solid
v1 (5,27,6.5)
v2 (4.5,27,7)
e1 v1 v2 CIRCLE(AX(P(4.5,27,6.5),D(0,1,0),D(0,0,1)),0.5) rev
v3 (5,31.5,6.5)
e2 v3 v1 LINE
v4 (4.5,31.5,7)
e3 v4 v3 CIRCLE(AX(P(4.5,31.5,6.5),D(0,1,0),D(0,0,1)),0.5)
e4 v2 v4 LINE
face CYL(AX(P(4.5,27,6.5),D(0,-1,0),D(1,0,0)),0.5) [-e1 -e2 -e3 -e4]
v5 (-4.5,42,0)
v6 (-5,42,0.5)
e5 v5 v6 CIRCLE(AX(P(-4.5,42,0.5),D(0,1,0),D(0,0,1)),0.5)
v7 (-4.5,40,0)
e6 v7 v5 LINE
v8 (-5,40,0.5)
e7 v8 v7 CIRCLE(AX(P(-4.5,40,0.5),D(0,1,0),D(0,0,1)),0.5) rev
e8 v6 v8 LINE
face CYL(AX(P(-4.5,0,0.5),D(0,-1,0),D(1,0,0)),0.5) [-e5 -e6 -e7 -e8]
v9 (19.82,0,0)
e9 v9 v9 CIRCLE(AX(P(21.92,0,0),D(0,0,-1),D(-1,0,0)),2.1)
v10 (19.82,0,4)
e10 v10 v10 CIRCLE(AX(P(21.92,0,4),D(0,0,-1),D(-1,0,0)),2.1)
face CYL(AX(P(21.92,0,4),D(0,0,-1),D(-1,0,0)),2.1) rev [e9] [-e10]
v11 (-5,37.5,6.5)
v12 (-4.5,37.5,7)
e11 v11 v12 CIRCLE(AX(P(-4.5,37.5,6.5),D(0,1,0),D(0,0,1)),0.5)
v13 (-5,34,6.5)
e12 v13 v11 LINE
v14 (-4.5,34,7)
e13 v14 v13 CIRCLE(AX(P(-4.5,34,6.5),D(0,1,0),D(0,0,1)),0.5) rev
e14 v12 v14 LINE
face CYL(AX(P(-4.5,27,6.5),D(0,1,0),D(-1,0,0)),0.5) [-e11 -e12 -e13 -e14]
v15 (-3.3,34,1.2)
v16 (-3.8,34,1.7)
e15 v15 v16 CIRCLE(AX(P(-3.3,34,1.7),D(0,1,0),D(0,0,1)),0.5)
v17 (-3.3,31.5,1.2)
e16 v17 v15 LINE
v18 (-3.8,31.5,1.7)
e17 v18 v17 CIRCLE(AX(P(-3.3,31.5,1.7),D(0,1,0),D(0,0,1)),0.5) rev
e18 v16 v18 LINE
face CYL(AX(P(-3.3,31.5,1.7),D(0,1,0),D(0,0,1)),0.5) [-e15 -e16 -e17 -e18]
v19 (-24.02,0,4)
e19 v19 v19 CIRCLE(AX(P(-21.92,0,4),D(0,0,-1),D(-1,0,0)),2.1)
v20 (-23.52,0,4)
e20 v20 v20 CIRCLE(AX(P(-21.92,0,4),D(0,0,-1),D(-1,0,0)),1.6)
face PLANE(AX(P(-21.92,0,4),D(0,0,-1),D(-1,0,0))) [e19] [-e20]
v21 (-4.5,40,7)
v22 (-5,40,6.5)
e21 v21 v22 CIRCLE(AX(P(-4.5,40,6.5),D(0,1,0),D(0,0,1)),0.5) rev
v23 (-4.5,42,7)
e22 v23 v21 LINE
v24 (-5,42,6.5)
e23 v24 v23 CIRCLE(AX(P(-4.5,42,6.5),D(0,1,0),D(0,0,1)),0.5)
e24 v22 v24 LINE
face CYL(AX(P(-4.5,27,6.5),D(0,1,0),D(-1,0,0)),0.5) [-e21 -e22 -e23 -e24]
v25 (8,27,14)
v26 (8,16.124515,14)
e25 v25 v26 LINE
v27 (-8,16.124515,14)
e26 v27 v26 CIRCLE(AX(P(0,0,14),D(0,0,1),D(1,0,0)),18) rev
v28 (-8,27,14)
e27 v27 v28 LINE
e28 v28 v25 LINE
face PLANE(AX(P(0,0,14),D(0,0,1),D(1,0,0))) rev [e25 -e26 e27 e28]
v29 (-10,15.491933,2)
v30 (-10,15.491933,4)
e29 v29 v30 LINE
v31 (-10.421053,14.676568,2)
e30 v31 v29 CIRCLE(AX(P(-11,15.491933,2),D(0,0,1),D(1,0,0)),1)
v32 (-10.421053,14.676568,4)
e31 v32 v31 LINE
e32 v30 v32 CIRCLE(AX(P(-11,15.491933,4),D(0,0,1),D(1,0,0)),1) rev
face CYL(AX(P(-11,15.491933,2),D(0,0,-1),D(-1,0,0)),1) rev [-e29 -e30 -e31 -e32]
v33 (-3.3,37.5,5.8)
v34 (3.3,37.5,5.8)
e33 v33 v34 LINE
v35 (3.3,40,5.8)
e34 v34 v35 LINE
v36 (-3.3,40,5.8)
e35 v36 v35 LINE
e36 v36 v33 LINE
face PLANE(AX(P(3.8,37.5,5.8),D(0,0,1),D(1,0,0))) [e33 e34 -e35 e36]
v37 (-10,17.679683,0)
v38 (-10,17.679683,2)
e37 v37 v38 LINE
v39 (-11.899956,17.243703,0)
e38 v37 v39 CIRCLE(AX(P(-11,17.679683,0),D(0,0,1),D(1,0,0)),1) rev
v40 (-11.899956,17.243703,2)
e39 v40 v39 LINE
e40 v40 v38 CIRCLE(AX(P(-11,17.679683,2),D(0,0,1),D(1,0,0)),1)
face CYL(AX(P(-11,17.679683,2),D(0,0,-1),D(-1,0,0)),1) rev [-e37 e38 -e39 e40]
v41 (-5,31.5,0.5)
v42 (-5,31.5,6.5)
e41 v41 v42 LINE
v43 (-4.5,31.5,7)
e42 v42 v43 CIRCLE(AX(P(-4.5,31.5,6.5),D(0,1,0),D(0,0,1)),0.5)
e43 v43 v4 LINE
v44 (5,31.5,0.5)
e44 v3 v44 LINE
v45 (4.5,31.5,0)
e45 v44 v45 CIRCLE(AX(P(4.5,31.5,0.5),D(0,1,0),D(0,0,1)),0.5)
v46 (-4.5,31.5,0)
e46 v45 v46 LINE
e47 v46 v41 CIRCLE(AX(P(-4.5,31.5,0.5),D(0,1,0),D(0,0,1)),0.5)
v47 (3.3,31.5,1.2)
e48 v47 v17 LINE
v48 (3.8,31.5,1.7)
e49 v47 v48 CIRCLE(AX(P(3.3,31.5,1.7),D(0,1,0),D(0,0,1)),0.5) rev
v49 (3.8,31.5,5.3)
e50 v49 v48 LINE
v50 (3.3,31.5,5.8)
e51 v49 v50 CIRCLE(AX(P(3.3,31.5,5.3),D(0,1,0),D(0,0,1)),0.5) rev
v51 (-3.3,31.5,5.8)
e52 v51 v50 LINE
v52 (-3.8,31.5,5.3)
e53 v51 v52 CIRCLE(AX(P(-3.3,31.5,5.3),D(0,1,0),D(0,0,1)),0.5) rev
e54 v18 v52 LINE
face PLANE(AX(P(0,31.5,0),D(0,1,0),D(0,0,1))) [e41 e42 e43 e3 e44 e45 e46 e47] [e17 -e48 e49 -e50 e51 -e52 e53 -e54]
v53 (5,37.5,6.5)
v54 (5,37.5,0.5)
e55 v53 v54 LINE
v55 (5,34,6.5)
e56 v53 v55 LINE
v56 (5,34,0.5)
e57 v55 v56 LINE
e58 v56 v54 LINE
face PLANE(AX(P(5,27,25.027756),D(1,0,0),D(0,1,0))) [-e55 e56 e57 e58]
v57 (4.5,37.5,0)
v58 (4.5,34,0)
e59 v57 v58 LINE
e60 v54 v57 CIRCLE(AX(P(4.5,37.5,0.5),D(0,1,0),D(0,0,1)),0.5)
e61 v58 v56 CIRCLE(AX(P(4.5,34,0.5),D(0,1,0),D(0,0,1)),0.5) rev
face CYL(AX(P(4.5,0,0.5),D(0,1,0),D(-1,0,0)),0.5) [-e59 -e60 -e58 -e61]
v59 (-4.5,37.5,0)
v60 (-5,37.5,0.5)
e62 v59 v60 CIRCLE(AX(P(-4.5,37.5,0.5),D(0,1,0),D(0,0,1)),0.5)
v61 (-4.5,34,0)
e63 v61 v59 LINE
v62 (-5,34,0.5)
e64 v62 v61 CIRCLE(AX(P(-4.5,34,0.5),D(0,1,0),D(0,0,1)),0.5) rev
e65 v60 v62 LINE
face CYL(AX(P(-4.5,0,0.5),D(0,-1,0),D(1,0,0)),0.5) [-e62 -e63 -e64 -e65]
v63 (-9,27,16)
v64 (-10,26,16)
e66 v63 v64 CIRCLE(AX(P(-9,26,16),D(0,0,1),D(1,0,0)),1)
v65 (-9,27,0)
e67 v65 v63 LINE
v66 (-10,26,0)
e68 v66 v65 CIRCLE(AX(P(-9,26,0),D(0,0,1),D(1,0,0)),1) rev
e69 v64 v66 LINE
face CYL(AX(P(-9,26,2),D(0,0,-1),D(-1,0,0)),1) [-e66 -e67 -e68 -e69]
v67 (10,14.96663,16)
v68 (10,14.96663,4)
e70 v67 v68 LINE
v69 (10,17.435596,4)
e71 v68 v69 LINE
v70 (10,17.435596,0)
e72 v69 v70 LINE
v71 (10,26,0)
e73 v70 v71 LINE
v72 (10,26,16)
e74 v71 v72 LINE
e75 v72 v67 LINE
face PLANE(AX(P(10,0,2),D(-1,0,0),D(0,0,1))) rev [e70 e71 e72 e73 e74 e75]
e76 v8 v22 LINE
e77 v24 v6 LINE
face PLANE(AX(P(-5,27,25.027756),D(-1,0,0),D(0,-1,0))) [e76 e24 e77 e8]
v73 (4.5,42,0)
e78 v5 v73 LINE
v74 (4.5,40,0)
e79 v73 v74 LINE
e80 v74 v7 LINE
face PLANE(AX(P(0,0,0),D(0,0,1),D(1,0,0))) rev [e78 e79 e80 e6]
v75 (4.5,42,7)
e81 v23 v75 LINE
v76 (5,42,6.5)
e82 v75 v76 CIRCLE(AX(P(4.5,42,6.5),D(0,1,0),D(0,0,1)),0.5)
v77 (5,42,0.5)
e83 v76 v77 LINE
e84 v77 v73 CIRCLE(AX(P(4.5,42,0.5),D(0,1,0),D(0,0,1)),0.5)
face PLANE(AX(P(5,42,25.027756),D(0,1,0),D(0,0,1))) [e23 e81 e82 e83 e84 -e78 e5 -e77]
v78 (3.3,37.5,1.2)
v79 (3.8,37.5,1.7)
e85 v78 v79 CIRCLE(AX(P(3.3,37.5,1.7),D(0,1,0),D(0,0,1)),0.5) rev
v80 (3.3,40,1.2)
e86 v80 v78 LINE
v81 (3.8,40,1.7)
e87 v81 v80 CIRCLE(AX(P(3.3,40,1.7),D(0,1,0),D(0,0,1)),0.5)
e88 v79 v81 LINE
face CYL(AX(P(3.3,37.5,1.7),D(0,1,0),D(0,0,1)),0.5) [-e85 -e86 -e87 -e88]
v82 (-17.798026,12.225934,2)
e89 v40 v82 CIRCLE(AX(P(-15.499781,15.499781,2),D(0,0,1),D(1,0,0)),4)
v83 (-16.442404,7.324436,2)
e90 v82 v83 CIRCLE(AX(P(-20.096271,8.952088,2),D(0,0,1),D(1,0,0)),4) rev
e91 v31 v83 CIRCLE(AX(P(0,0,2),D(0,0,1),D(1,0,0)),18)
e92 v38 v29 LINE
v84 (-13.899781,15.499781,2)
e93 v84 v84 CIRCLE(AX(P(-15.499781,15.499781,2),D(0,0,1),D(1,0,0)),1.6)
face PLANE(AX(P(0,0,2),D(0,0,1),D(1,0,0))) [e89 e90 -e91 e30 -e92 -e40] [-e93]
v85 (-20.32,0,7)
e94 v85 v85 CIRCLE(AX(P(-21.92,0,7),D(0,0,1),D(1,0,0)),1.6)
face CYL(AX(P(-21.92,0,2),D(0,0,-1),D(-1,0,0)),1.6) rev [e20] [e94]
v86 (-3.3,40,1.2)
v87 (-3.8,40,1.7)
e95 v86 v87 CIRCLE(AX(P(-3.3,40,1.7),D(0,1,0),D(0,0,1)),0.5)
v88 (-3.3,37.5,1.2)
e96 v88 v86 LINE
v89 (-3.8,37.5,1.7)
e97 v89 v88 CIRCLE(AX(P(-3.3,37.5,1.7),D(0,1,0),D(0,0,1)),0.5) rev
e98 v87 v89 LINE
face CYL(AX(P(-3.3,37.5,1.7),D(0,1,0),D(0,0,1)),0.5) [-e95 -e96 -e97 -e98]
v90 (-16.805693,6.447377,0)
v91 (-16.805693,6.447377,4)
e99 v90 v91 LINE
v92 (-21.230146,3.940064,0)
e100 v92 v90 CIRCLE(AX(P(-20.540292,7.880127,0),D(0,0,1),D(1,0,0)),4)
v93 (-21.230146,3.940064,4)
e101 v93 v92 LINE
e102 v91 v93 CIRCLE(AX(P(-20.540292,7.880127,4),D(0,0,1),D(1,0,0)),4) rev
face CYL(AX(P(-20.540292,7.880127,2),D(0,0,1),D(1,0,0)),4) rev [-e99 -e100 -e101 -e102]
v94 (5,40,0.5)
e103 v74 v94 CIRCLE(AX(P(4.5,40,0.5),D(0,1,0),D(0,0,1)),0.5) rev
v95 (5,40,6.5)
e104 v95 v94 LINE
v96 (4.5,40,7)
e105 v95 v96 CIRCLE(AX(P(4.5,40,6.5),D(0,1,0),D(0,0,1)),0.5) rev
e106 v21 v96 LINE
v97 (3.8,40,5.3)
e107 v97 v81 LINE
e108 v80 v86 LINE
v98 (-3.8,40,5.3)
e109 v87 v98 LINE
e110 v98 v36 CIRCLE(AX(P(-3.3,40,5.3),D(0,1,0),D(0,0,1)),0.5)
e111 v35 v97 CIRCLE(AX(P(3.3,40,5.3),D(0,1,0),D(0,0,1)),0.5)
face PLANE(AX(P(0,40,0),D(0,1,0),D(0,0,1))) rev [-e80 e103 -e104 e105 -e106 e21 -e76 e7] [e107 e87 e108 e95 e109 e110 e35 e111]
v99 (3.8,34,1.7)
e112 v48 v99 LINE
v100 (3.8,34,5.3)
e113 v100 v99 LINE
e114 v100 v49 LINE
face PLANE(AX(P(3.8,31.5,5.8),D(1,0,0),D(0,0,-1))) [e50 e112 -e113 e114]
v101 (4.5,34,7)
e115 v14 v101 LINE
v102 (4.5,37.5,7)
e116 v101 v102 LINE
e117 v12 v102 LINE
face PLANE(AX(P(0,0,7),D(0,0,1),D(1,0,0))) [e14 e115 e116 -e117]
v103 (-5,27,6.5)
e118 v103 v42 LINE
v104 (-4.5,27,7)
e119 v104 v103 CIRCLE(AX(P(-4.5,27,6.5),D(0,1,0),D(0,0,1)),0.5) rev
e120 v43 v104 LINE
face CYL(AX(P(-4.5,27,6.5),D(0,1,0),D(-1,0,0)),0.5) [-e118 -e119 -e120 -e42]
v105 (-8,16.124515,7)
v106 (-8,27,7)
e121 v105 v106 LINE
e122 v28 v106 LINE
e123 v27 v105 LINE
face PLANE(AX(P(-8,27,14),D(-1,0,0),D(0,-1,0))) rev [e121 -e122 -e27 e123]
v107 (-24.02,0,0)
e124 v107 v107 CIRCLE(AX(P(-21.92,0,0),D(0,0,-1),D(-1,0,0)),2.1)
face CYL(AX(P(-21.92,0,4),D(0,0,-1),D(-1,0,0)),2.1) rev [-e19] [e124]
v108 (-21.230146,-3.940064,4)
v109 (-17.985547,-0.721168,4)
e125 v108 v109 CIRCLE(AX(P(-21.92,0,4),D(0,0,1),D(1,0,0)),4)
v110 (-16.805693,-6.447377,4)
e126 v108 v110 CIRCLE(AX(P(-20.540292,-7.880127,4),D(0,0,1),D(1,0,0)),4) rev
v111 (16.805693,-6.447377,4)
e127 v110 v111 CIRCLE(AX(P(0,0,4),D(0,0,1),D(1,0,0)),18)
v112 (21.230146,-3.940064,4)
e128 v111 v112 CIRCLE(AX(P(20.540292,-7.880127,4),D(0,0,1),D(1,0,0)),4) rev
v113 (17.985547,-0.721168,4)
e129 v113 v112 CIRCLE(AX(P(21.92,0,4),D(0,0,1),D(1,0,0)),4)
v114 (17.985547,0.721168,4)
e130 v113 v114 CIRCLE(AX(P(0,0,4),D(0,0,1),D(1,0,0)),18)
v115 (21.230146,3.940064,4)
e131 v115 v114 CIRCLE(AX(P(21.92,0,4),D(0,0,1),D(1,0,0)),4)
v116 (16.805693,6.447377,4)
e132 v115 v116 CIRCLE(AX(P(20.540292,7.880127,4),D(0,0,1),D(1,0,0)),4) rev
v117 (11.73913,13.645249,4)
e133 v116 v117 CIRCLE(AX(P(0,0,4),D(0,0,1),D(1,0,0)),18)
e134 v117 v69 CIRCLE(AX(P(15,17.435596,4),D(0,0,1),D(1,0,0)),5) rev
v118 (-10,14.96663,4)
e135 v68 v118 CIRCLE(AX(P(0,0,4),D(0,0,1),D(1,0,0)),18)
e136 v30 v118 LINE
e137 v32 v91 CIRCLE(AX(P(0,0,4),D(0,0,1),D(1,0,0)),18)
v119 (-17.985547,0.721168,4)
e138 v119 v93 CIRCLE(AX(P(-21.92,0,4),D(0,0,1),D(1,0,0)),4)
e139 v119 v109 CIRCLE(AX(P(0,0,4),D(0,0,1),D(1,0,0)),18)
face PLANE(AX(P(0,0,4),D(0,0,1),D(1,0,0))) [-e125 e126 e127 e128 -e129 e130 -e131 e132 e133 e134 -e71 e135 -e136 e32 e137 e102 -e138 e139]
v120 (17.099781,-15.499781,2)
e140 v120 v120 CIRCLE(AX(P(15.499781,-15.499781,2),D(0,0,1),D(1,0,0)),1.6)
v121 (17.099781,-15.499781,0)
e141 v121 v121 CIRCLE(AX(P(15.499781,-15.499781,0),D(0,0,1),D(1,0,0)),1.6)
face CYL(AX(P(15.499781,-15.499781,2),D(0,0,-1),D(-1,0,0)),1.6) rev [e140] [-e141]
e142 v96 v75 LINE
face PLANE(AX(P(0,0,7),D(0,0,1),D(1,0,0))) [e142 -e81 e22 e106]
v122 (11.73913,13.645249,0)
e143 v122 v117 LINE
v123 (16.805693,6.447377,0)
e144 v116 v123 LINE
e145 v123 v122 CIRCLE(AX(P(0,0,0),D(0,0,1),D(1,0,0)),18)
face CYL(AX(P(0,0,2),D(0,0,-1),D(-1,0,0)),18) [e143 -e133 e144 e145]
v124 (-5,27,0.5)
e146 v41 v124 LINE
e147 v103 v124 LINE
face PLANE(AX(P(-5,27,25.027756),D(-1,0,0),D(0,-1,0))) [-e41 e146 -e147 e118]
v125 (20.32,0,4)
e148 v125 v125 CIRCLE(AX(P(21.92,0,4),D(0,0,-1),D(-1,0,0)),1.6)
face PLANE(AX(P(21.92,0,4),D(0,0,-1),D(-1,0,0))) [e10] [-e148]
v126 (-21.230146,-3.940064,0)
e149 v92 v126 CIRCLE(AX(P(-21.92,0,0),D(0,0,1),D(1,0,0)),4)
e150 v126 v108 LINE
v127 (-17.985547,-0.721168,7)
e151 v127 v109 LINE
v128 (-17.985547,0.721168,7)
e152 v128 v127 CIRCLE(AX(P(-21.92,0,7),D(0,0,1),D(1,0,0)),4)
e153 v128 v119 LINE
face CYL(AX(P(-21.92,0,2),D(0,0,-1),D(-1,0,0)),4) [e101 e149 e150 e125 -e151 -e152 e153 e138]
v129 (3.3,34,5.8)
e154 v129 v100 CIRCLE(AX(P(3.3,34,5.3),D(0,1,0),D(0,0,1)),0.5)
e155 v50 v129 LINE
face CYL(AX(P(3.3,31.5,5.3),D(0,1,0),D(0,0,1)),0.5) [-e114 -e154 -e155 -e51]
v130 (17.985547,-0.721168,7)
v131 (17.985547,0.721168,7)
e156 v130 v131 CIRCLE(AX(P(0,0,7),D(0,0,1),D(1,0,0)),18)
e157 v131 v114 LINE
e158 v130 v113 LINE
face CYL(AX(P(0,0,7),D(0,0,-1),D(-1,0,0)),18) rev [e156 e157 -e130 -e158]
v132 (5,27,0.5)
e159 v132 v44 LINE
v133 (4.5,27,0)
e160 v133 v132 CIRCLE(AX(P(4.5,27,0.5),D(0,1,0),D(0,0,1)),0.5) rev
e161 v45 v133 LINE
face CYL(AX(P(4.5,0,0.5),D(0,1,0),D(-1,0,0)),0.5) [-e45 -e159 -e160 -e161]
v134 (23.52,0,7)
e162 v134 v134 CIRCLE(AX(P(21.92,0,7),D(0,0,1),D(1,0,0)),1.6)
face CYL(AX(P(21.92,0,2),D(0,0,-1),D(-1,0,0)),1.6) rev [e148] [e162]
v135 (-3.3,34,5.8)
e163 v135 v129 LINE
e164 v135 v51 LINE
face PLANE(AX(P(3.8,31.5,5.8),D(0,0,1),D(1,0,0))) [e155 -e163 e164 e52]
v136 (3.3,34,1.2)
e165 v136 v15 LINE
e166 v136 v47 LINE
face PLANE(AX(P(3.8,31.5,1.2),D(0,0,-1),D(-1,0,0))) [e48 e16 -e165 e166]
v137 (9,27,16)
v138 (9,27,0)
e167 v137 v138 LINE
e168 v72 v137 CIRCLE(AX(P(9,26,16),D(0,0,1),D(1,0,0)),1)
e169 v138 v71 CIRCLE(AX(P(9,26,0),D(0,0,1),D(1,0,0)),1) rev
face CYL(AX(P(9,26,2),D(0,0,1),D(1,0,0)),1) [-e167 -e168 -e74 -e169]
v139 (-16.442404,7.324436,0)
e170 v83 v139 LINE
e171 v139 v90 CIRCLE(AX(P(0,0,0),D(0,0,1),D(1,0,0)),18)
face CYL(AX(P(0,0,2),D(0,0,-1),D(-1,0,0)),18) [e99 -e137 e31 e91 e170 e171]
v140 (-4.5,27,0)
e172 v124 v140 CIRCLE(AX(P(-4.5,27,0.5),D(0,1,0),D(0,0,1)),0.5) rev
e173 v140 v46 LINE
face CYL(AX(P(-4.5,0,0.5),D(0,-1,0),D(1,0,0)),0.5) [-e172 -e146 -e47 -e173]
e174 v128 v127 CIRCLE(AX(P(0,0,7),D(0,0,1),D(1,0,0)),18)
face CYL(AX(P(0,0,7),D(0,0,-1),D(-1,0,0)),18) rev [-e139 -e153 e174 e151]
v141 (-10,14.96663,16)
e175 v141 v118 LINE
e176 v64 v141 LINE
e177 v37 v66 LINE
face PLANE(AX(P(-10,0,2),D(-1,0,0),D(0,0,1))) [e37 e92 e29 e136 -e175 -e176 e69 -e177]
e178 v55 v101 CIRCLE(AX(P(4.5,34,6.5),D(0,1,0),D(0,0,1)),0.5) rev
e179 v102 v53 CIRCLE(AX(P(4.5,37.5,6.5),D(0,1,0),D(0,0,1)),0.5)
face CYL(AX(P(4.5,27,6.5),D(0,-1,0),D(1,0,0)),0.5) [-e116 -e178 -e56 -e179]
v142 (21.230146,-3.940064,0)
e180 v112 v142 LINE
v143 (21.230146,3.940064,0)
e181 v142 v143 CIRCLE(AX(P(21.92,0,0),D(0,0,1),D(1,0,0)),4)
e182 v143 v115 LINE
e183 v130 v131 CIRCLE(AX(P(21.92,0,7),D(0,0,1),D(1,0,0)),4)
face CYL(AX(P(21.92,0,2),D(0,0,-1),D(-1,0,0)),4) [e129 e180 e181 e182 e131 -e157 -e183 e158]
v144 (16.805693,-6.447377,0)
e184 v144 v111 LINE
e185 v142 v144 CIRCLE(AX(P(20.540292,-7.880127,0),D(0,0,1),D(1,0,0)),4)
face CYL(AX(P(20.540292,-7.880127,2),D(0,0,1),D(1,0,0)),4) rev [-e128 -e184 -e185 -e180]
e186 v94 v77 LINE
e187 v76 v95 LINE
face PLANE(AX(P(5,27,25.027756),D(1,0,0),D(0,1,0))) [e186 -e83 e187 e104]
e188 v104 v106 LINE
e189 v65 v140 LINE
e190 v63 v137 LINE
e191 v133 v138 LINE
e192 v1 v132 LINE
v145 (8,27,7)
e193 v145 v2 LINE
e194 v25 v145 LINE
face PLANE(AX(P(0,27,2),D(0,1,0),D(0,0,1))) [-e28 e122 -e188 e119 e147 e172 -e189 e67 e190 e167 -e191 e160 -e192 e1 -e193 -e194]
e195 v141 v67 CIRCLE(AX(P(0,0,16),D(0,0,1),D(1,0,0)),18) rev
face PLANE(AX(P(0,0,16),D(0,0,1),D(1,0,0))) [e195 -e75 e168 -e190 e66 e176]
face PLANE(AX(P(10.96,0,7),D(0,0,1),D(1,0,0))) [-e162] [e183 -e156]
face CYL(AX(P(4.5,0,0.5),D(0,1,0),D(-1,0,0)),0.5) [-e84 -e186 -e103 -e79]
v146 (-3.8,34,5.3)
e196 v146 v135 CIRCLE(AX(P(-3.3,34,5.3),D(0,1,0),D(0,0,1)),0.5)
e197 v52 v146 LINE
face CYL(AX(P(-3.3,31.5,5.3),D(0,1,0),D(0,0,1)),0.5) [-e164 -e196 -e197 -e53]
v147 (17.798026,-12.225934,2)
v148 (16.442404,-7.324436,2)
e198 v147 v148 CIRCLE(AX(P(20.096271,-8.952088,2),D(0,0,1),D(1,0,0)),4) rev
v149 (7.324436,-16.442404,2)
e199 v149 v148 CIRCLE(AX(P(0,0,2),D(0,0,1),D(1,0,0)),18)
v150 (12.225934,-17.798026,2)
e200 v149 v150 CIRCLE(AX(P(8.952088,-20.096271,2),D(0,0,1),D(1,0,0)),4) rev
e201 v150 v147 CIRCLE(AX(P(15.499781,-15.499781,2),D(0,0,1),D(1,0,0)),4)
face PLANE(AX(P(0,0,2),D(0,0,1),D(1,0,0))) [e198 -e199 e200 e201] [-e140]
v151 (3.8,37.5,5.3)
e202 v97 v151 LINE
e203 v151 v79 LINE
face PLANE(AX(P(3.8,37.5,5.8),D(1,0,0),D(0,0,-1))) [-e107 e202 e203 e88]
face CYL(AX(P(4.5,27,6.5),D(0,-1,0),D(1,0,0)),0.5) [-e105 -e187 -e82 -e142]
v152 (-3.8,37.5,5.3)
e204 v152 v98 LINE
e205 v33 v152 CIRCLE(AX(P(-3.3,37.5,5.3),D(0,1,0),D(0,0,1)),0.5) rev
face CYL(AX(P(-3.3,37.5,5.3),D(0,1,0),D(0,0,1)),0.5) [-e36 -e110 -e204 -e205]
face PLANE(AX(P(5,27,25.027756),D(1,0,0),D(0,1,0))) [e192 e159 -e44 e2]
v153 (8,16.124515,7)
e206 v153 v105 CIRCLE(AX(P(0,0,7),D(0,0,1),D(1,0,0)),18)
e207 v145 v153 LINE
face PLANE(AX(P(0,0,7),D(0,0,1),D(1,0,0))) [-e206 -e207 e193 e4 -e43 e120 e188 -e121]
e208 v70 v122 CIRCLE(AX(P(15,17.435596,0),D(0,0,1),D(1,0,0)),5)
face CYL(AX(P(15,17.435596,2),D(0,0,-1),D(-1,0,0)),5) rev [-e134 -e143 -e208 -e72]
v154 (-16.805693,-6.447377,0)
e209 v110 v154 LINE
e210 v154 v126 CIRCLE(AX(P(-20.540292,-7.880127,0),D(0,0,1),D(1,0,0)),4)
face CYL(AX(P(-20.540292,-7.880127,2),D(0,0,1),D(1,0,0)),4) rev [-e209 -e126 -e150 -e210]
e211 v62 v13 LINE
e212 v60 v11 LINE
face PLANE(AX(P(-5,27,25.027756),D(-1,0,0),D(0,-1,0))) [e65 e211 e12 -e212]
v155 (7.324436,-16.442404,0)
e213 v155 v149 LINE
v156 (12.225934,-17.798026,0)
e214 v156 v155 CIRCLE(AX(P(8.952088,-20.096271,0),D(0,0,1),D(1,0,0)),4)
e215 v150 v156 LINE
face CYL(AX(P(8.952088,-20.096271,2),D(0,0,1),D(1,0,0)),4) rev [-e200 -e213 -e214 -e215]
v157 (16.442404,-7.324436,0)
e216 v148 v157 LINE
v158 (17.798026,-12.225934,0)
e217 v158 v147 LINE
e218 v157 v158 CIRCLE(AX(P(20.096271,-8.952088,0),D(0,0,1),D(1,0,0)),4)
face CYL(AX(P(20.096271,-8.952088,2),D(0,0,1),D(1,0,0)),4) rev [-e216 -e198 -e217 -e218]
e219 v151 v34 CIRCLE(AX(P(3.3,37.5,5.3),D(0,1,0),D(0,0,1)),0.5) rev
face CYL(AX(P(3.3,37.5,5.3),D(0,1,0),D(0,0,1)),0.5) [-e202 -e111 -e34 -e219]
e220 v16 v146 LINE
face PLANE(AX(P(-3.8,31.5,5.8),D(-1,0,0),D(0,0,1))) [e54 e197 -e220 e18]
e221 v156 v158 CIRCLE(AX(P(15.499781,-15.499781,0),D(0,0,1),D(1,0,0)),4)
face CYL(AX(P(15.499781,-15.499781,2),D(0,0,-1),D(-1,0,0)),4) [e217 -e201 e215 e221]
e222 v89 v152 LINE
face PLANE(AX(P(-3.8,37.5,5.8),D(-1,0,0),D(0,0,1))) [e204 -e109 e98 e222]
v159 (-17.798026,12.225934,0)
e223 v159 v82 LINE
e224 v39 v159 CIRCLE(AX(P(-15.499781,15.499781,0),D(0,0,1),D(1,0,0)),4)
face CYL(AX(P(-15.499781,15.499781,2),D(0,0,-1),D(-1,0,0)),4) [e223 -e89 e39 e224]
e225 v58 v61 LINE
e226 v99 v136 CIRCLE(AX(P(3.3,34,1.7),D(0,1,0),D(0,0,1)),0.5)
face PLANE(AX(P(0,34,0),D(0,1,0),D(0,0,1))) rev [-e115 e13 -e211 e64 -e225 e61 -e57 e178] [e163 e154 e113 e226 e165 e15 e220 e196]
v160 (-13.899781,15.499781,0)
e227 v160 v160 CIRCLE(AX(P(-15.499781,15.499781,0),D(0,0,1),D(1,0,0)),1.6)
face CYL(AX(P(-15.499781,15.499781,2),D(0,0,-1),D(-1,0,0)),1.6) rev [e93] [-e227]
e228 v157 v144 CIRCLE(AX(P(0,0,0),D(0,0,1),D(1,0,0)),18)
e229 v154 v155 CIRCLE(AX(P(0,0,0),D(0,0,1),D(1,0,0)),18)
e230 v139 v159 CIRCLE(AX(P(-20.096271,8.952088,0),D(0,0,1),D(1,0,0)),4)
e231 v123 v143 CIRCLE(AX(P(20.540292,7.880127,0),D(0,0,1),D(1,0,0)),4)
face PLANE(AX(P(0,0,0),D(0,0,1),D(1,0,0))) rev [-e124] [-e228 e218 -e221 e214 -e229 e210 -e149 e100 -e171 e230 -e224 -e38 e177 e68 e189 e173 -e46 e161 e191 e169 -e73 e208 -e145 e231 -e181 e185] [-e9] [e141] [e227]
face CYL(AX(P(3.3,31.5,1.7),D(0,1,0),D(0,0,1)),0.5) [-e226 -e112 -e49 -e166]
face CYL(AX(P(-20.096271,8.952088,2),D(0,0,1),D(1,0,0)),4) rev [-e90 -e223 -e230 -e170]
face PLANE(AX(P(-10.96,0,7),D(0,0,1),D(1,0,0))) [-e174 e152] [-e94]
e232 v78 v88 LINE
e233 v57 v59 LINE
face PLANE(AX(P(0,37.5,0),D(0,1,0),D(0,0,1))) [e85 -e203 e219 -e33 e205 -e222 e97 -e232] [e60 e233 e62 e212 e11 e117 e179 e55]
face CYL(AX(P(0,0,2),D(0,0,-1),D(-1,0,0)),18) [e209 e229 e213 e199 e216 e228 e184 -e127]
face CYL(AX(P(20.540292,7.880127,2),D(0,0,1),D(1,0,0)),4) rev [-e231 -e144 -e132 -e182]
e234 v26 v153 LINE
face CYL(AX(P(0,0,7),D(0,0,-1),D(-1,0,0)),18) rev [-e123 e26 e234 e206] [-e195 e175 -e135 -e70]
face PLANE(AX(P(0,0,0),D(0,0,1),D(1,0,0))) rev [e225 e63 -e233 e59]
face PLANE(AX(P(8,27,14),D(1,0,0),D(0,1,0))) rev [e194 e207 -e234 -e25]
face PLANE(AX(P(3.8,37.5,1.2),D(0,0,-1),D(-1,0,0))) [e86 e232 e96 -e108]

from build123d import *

# Parameters (mm, degrees)
SKETCH_1_R                = 1.6
EXTRUDE_1_DEPTH           = 2
EXTRUDE_START             = 2
EXTRUDE_2_OUTLINE_R       = 1.6
EXTRUDE_2_DEPTH           = 2
EXTRUDE_START_2           = 4
SKETCH_1_4_R              = 1.6
EXTRUDE_3_DEPTH           = 3
FILLET_2_DEPTH            = 4
FILLET_2_2_DEPTH          = 2
FILLET_3_DEPTH            = 2
EXTRUDE_4_DEPTH           = 7
EXTRUDE_5_DEPTH           = 2
SKETCH_4_W                = 10
SKETCH_4_H                = 15
EXTRUDE_6_DEPTH           = 7
CUT_EXTRUDE_START         = -2
SKETCH_5_W                = 10
SKETCH_5_H                = 7
SKETCH_5_W_2              = 7.6
SKETCH_5_H_2              = 4.6
CUT_EXTRUDE_1_DEPTH       = 2.5
CUT_EXTRUDE_START_2       = -5
CUT_EXTRUDE_2_OUTLINE_W   = 2.5
CUT_EXTRUDE_2_OUTLINE_H   = 1.2
CUT_EXTRUDE_2_DEPTH       = 10
CUT_EXTRUDE_2_2_OUTLINE_W = 2.5
CUT_EXTRUDE_2_2_OUTLINE_H = 4.6
CUT_EXTRUDE_2_2_DEPTH     = 1.2
CUT_EXTRUDE_START_3       = 3.8
CUT_EXTRUDE_2_3_OUTLINE_W = 2.5
CUT_EXTRUDE_2_3_OUTLINE_H = 4.6
CUT_EXTRUDE_2_3_DEPTH     = 1.2
FILLET_4_R                = 5
FILLET_5_R                = 1
FILLET_6_R                = 0.5
SKETCH_6_R                = 2.1
CUT_EXTRUDE_3_DEPTH       = 4


with BuildPart() as part:
    # Эскиз1 → Бобышка-Вытянуть1 (new body)
    with BuildSketch(Plane.XY):
        with BuildLine():
            ThreePointArc((12.207759872, -13.227645252), (18.328207768, -18.328207768), (13.227645252, -12.207759872))
            ThreePointArc((13.227645252, -12.207759872), (16.629831585, -6.888301783), (17.985547445, -0.721167868))
            ThreePointArc((17.985547445, -0.721167868), (25.92, 0), (17.985547445, 0.721167868))
            ThreePointArc((17.985547445, 0.721167868), (15.70130603, 8.801646945), (10, 14.966629547))
            Line((10, 14.966629547), (10, 27))
            Line((10, 27), (-10, 27))
            Line((-10, 27), (-10, 14.966629547))
            ThreePointArc((-10, 14.966629547), (-11.137870812, 14.140291149), (-12.207759872, 13.227645252))
            ThreePointArc((-12.207759872, 13.227645252), (-18.328207768, 18.328207768), (-13.227645252, 12.207759872))
            ThreePointArc((-13.227645252, 12.207759872), (-16.629831585, 6.888301783), (-17.985547445, 0.721167868))
            ThreePointArc((-17.985547445, 0.721167868), (-25.92, 0), (-17.985547445, -0.721167868))
            ThreePointArc((-17.985547445, -0.721167868), (-6.888301783, -16.629831585), (12.207759872, -13.227645252))
        make_face()
        with Locations((15.499780644, -15.499780644)):
            Circle(SKETCH_1_R, mode=Mode.SUBTRACT)
        with Locations((-21.92, 0)):
            Circle(SKETCH_1_R, mode=Mode.SUBTRACT)
        with Locations((21.92, 0)):
            Circle(SKETCH_1_R, mode=Mode.SUBTRACT)
        with Locations((-15.499780644, 15.499780644)):
            Circle(SKETCH_1_R, mode=Mode.SUBTRACT)
    extrude(amount=EXTRUDE_1_DEPTH)

    # Бобышка-Вытянуть2: read off the stored shape, not the designer's step
    # Бобышка-Вытянуть2 outline → Бобышка-Вытянуть2 (add)
    with BuildSketch(Plane.XY.offset(EXTRUDE_START)):
        with BuildLine():
            ThreePointArc((17.985547445, -0.721167868), (25.92, 0), (17.985547445, 0.721167868))
            ThreePointArc((17.985547445, 0.721167868), (15.70130603, 8.801646944), (10, 14.966629547))
            Line((10, 14.966629547), (10, 27))
            Line((10, 27), (-10, 27))
            Line((-10, 27), (-10, 14.966629547))
            ThreePointArc((-10, 14.966629547), (-15.70130603, 8.801646944), (-17.985547445, 0.721167868))
            ThreePointArc((-17.985547445, 0.721167868), (-25.92, 0), (-17.985547445, -0.721167868))
            ThreePointArc((-17.985547445, -0.721167868), (0, -18), (17.985547445, -0.721167868))
        make_face()
        with Locations((-21.92, 0)):
            Circle(EXTRUDE_2_OUTLINE_R, mode=Mode.SUBTRACT)
        with Locations((21.92, 0)):
            Circle(EXTRUDE_2_OUTLINE_R, mode=Mode.SUBTRACT)
    extrude(amount=EXTRUDE_2_DEPTH)

    # Эскиз1<4> → Бобышка-Вытянуть3 (add)
    # profile 1 of 3: a face of its own
    with BuildSketch(Plane.XY.offset(EXTRUDE_START_2)):
        with BuildLine():
            ThreePointArc((17.985547445, 0.721167868), (17.996386499, 0.360656336), (18, 0))
            ThreePointArc((18, 0), (17.996386499, -0.360656336), (17.985547445, -0.721167868))
            ThreePointArc((17.985547445, -0.721167868), (25.92, 0), (17.985547445, 0.721167868))
        make_face()
        with Locations((21.92, 0)):
            Circle(SKETCH_1_4_R, mode=Mode.SUBTRACT)
    # profile 2 of 3: a face of its own
    with BuildSketch(Plane.XY.offset(EXTRUDE_START_2)):
        with BuildLine():
            ThreePointArc((-10, 14.966629547), (0, 18), (10, 14.966629547))
            Line((10, 14.966629547), (10, 27))
            Line((10, 27), (-10, 27))
            Line((-10, 27), (-10, 14.966629547))
        make_face()
    # profile 3 of 3: a face of its own
    with BuildSketch(Plane.XY.offset(EXTRUDE_START_2)):
        with BuildLine():
            ThreePointArc((-17.985547445, -0.721167868), (-17.996386499, -0.360656336), (-18, 0))
            ThreePointArc((-18, 0), (-17.996386499, 0.360656336), (-17.985547445, 0.721167868))
            ThreePointArc((-17.985547445, 0.721167868), (-25.92, 0), (-17.985547445, -0.721167868))
        make_face()
        with Locations((-21.92, 0)):
            Circle(SKETCH_1_4_R, mode=Mode.SUBTRACT)
    extrude(amount=EXTRUDE_3_DEPTH)

    # Скругление2: read off the stored shape, not the designer's step
    # Скругление2 outline → Скругление2 (add)
    with BuildSketch(Plane.XY):
        with BuildLine():
            ThreePointArc((-16.805693431, 6.447376855), (-18.568168191, 4.400080171), (-21.230145985, 3.940063634))
            ThreePointArc((-21.230145985, 3.940063634), (-19.102842691, 2.839652215), (-17.985547445, 0.721167868))
            ThreePointArc((-17.985547445, 0.721167868), (-17.629661873, 3.632495318), (-16.805693431, 6.447376855))
        make_face()
        with BuildLine():
            ThreePointArc((-21.230145985, -3.940063634), (-18.568168191, -4.400080171), (-16.805693431, -6.447376855))
            ThreePointArc((-16.805693431, -6.447376855), (-17.629661873, -3.632495318), (-17.985547445, -0.721167868))
            ThreePointArc((-17.985547445, -0.721167868), (-19.102842691, -2.839652215), (-21.230145985, -3.940063634))
        make_face()
        with BuildLine():
            ThreePointArc((17.985547445, 0.721167868), (19.102842691, 2.839652215), (21.230145985, 3.940063634))
            ThreePointArc((21.230145985, 3.940063634), (18.568168191, 4.400080171), (16.805693431, 6.447376855))
            ThreePointArc((16.805693431, 6.447376855), (17.629661873, 3.632495318), (17.985547445, 0.721167868))
        make_face()
        with BuildLine():
            ThreePointArc((17.985547445, -0.721167868), (17.629661873, -3.632495318), (16.805693431, -6.447376855))
            ThreePointArc((16.805693431, -6.447376855), (18.568168191, -4.400080171), (21.230145985, -3.940063634))
            ThreePointArc((21.230145985, -3.940063634), (19.102842691, -2.839652215), (17.985547445, -0.721167868))
        make_face()
    extrude(amount=FILLET_2_DEPTH)

    # Fillet 2 2 outline → Fillet 2 2 (add)
    with BuildSketch(Plane.XY):
        with BuildLine():
            ThreePointArc((-17.798025906, 12.225934478), (-16.241004168, 10.018351115), (-16.442403683, 7.324435892))
            ThreePointArc((-16.442403683, 7.324435892), (-15.034615533, 9.897491388), (-13.227645252, 12.207759872))
            ThreePointArc((-13.227645252, 12.207759872), (-15.515686945, 11.49981227), (-17.798025906, 12.225934478))
        make_face()
        with BuildLine():
            ThreePointArc((7.324435892, -16.442403683), (10.018351115, -16.241004168), (12.225934478, -17.798025906))
            ThreePointArc((12.225934478, -17.798025906), (11.49981227, -15.515686945), (12.207759872, -13.227645252))
            ThreePointArc((12.207759872, -13.227645252), (9.897491388, -15.034615533), (7.324435892, -16.442403683))
        make_face()
        with BuildLine():
            ThreePointArc((13.227645252, -12.207759872), (15.515686945, -11.49981227), (17.798025906, -12.225934478))
            ThreePointArc((17.798025906, -12.225934478), (16.241004168, -10.018351115), (16.442403683, -7.324435892))
            ThreePointArc((16.442403683, -7.324435892), (15.034615533, -9.897491388), (13.227645252, -12.207759872))
        make_face()
    extrude(amount=FILLET_2_2_DEPTH)

    # Скругление3: read off the stored shape, not the designer's step
    # Скругление3 outline → Скругление3 (add)
    with BuildSketch(Plane.XY):
        with BuildLine():
            Line((-10, 14.966629547), (-10, 17.679682972))
            ThreePointArc((-10, 17.679682972), (-10.776344158, 16.70501479), (-11.899956129, 17.243702506))
            ThreePointArc((-11.899956129, 17.243702506), (-11.511477517, 15.194104067), (-12.207759872, 13.227645252))
            ThreePointArc((-12.207759872, 13.227645252), (-11.137870812, 14.140291149), (-10, 14.966629547))
        make_face()
    extrude(amount=FILLET_3_DEPTH)

    # Эскиз2 → Бобышка-Вытянуть4 (add)
    with BuildSketch(Plane.XY.offset(7)):
        with BuildLine():
            Line((-10, 27), (-8, 27))
            Line((-8, 27), (-8, 16.124515497))
            ThreePointArc((-8, 16.124515497), (-9.018601608, 15.577702816), (-10, 14.966629547))
            Line((-10, 14.966629547), (-10, 27))
        make_face()
        with BuildLine():
            Line((10, 27), (8, 27))
            Line((8, 27), (8, 16.124515497))
            ThreePointArc((8, 16.124515497), (9.018601608, 15.577702816), (10, 14.966629547))
            Line((10, 14.966629547), (10, 27))
        make_face()
    extrude(amount=EXTRUDE_4_DEPTH)

    # Эскиз3 → Бобышка-Вытянуть5 (add)
    with BuildSketch(Plane.XY.offset(14)):
        with BuildLine():
            Line((10, 27), (-8, 27))
            Line((-8, 27), (-8, 16.124515497))
            ThreePointArc((-8, 16.124515497), (1.155497714, 17.962873518), (10, 14.966629547))
            Line((10, 14.966629547), (10, 27))
        make_face()
        with BuildLine():
            Line((-8, 27), (-10, 27))
            Line((-10, 27), (-10, 14.966629547))
            ThreePointArc((-10, 14.966629547), (-9.018601608, 15.577702816), (-8, 16.124515497))
            Line((-8, 16.124515497), (-8, 27))
        make_face()
    extrude(amount=EXTRUDE_5_DEPTH)

    # Эскиз4 → Бобышка-Вытянуть6 (add)
    with BuildSketch(Plane(origin=(0, 0, 0), x_dir=(-1, 0, 0), z_dir=(0, 0, -1))):
        with Locations((0, 34.5)):
            Rectangle(SKETCH_4_W, SKETCH_4_H)
    extrude(amount=-EXTRUDE_6_DEPTH)

    # Эскиз5 → Вырез-Вытянуть1 (cut)
    with BuildSketch(Plane(origin=(0, 42, 0), x_dir=(1, 0, 0), z_dir=(0, 1, 0)).offset(CUT_EXTRUDE_START)):
        with Locations((0, -3.5)):
            Rectangle(SKETCH_5_W, SKETCH_5_H)
        with Locations((0, -3.5)):
            Rectangle(SKETCH_5_W_2, SKETCH_5_H_2, mode=Mode.SUBTRACT)
    extrude(amount=-CUT_EXTRUDE_1_DEPTH, mode=Mode.SUBTRACT)

    # Вырез-Вытянуть2: read off the stored shape, not the designer's step
    # Вырез-Вытянуть2 outline → Вырез-Вытянуть2 (cut)
    with BuildSketch(Plane.YZ.offset(CUT_EXTRUDE_START_2)):
        with Locations((32.75, 6.4)):
            Rectangle(CUT_EXTRUDE_2_OUTLINE_W, CUT_EXTRUDE_2_OUTLINE_H)
        with Locations((32.75, 0.6)):
            Rectangle(CUT_EXTRUDE_2_OUTLINE_W, CUT_EXTRUDE_2_OUTLINE_H)
    extrude(amount=CUT_EXTRUDE_2_DEPTH, mode=Mode.SUBTRACT)

    # Cut-Extrude 2 2 outline → Cut-Extrude 2 2 (cut)
    with BuildSketch(Plane.YZ.offset(CUT_EXTRUDE_START_2)):
        with Locations((32.75, 3.5)):
            Rectangle(CUT_EXTRUDE_2_2_OUTLINE_W, CUT_EXTRUDE_2_2_OUTLINE_H)
    extrude(amount=CUT_EXTRUDE_2_2_DEPTH, mode=Mode.SUBTRACT)

    # Cut-Extrude 2 3 outline → Cut-Extrude 2 3 (cut)
    with BuildSketch(Plane.YZ.offset(CUT_EXTRUDE_START_3)):
        with Locations((32.75, 3.5)):
            Rectangle(CUT_EXTRUDE_2_3_OUTLINE_W, CUT_EXTRUDE_2_3_OUTLINE_H)
    extrude(amount=CUT_EXTRUDE_2_3_DEPTH, mode=Mode.SUBTRACT)

    # Скругление4
    fillet_4_edges = [part.edges().sort_by_distance(p)[0] for p in [
        (10, 14.966629547, 1),
    ]]
    fillet(fillet_4_edges, radius=FILLET_4_R)

    # Скругление5
    fillet_5_edges = [part.edges().sort_by_distance(p)[0] for p in [
        (-10, 14.966629547, 3),
        (-10, 27, 8),
        (10, 27, 8),
    ]]
    fillet(fillet_5_edges, radius=FILLET_5_R)

    # Скругление6
    fillet_6_edges = [part.edges().sort_by_distance(p)[0] for p in [
        (5, 41, 0),
        (-5, 29.25, 0),
        (-5, 29.25, 7),
        (5, 41, 7),
        (5, 35.75, 7),
        (5, 35.75, 0),
        (-5, 41, 7),
        (-5, 41, 0),
        (3.8, 38.75, 5.8),
        (-3.8, 38.75, 5.8),
        (-3.8, 38.75, 1.2),
        (3.8, 38.75, 1.2),
        (5, 29.25, 0),
        (5, 29.25, 7),
        (-5, 35.75, 7),
        (-5, 35.75, 0),
        (3.8, 32.75, 5.8),
        (-3.8, 32.75, 5.8),
        (-3.8, 32.75, 1.2),
        (3.8, 32.75, 1.2),
    ]]
    fillet(fillet_6_edges, radius=FILLET_6_R)

    # Эскиз6 → Вырез-Вытянуть3 (cut)
    with BuildSketch(Plane(origin=(0, 0, 0), x_dir=(-1, 0, 0), z_dir=(0, 0, -1))):
        with Locations((-21.92, 0)):
            Circle(SKETCH_6_R)
        with Locations((21.92, 0)):
            Circle(SKETCH_6_R)
    extrude(amount=-CUT_EXTRUDE_3_DEPTH, mode=Mode.SUBTRACT)


solid = part.part
